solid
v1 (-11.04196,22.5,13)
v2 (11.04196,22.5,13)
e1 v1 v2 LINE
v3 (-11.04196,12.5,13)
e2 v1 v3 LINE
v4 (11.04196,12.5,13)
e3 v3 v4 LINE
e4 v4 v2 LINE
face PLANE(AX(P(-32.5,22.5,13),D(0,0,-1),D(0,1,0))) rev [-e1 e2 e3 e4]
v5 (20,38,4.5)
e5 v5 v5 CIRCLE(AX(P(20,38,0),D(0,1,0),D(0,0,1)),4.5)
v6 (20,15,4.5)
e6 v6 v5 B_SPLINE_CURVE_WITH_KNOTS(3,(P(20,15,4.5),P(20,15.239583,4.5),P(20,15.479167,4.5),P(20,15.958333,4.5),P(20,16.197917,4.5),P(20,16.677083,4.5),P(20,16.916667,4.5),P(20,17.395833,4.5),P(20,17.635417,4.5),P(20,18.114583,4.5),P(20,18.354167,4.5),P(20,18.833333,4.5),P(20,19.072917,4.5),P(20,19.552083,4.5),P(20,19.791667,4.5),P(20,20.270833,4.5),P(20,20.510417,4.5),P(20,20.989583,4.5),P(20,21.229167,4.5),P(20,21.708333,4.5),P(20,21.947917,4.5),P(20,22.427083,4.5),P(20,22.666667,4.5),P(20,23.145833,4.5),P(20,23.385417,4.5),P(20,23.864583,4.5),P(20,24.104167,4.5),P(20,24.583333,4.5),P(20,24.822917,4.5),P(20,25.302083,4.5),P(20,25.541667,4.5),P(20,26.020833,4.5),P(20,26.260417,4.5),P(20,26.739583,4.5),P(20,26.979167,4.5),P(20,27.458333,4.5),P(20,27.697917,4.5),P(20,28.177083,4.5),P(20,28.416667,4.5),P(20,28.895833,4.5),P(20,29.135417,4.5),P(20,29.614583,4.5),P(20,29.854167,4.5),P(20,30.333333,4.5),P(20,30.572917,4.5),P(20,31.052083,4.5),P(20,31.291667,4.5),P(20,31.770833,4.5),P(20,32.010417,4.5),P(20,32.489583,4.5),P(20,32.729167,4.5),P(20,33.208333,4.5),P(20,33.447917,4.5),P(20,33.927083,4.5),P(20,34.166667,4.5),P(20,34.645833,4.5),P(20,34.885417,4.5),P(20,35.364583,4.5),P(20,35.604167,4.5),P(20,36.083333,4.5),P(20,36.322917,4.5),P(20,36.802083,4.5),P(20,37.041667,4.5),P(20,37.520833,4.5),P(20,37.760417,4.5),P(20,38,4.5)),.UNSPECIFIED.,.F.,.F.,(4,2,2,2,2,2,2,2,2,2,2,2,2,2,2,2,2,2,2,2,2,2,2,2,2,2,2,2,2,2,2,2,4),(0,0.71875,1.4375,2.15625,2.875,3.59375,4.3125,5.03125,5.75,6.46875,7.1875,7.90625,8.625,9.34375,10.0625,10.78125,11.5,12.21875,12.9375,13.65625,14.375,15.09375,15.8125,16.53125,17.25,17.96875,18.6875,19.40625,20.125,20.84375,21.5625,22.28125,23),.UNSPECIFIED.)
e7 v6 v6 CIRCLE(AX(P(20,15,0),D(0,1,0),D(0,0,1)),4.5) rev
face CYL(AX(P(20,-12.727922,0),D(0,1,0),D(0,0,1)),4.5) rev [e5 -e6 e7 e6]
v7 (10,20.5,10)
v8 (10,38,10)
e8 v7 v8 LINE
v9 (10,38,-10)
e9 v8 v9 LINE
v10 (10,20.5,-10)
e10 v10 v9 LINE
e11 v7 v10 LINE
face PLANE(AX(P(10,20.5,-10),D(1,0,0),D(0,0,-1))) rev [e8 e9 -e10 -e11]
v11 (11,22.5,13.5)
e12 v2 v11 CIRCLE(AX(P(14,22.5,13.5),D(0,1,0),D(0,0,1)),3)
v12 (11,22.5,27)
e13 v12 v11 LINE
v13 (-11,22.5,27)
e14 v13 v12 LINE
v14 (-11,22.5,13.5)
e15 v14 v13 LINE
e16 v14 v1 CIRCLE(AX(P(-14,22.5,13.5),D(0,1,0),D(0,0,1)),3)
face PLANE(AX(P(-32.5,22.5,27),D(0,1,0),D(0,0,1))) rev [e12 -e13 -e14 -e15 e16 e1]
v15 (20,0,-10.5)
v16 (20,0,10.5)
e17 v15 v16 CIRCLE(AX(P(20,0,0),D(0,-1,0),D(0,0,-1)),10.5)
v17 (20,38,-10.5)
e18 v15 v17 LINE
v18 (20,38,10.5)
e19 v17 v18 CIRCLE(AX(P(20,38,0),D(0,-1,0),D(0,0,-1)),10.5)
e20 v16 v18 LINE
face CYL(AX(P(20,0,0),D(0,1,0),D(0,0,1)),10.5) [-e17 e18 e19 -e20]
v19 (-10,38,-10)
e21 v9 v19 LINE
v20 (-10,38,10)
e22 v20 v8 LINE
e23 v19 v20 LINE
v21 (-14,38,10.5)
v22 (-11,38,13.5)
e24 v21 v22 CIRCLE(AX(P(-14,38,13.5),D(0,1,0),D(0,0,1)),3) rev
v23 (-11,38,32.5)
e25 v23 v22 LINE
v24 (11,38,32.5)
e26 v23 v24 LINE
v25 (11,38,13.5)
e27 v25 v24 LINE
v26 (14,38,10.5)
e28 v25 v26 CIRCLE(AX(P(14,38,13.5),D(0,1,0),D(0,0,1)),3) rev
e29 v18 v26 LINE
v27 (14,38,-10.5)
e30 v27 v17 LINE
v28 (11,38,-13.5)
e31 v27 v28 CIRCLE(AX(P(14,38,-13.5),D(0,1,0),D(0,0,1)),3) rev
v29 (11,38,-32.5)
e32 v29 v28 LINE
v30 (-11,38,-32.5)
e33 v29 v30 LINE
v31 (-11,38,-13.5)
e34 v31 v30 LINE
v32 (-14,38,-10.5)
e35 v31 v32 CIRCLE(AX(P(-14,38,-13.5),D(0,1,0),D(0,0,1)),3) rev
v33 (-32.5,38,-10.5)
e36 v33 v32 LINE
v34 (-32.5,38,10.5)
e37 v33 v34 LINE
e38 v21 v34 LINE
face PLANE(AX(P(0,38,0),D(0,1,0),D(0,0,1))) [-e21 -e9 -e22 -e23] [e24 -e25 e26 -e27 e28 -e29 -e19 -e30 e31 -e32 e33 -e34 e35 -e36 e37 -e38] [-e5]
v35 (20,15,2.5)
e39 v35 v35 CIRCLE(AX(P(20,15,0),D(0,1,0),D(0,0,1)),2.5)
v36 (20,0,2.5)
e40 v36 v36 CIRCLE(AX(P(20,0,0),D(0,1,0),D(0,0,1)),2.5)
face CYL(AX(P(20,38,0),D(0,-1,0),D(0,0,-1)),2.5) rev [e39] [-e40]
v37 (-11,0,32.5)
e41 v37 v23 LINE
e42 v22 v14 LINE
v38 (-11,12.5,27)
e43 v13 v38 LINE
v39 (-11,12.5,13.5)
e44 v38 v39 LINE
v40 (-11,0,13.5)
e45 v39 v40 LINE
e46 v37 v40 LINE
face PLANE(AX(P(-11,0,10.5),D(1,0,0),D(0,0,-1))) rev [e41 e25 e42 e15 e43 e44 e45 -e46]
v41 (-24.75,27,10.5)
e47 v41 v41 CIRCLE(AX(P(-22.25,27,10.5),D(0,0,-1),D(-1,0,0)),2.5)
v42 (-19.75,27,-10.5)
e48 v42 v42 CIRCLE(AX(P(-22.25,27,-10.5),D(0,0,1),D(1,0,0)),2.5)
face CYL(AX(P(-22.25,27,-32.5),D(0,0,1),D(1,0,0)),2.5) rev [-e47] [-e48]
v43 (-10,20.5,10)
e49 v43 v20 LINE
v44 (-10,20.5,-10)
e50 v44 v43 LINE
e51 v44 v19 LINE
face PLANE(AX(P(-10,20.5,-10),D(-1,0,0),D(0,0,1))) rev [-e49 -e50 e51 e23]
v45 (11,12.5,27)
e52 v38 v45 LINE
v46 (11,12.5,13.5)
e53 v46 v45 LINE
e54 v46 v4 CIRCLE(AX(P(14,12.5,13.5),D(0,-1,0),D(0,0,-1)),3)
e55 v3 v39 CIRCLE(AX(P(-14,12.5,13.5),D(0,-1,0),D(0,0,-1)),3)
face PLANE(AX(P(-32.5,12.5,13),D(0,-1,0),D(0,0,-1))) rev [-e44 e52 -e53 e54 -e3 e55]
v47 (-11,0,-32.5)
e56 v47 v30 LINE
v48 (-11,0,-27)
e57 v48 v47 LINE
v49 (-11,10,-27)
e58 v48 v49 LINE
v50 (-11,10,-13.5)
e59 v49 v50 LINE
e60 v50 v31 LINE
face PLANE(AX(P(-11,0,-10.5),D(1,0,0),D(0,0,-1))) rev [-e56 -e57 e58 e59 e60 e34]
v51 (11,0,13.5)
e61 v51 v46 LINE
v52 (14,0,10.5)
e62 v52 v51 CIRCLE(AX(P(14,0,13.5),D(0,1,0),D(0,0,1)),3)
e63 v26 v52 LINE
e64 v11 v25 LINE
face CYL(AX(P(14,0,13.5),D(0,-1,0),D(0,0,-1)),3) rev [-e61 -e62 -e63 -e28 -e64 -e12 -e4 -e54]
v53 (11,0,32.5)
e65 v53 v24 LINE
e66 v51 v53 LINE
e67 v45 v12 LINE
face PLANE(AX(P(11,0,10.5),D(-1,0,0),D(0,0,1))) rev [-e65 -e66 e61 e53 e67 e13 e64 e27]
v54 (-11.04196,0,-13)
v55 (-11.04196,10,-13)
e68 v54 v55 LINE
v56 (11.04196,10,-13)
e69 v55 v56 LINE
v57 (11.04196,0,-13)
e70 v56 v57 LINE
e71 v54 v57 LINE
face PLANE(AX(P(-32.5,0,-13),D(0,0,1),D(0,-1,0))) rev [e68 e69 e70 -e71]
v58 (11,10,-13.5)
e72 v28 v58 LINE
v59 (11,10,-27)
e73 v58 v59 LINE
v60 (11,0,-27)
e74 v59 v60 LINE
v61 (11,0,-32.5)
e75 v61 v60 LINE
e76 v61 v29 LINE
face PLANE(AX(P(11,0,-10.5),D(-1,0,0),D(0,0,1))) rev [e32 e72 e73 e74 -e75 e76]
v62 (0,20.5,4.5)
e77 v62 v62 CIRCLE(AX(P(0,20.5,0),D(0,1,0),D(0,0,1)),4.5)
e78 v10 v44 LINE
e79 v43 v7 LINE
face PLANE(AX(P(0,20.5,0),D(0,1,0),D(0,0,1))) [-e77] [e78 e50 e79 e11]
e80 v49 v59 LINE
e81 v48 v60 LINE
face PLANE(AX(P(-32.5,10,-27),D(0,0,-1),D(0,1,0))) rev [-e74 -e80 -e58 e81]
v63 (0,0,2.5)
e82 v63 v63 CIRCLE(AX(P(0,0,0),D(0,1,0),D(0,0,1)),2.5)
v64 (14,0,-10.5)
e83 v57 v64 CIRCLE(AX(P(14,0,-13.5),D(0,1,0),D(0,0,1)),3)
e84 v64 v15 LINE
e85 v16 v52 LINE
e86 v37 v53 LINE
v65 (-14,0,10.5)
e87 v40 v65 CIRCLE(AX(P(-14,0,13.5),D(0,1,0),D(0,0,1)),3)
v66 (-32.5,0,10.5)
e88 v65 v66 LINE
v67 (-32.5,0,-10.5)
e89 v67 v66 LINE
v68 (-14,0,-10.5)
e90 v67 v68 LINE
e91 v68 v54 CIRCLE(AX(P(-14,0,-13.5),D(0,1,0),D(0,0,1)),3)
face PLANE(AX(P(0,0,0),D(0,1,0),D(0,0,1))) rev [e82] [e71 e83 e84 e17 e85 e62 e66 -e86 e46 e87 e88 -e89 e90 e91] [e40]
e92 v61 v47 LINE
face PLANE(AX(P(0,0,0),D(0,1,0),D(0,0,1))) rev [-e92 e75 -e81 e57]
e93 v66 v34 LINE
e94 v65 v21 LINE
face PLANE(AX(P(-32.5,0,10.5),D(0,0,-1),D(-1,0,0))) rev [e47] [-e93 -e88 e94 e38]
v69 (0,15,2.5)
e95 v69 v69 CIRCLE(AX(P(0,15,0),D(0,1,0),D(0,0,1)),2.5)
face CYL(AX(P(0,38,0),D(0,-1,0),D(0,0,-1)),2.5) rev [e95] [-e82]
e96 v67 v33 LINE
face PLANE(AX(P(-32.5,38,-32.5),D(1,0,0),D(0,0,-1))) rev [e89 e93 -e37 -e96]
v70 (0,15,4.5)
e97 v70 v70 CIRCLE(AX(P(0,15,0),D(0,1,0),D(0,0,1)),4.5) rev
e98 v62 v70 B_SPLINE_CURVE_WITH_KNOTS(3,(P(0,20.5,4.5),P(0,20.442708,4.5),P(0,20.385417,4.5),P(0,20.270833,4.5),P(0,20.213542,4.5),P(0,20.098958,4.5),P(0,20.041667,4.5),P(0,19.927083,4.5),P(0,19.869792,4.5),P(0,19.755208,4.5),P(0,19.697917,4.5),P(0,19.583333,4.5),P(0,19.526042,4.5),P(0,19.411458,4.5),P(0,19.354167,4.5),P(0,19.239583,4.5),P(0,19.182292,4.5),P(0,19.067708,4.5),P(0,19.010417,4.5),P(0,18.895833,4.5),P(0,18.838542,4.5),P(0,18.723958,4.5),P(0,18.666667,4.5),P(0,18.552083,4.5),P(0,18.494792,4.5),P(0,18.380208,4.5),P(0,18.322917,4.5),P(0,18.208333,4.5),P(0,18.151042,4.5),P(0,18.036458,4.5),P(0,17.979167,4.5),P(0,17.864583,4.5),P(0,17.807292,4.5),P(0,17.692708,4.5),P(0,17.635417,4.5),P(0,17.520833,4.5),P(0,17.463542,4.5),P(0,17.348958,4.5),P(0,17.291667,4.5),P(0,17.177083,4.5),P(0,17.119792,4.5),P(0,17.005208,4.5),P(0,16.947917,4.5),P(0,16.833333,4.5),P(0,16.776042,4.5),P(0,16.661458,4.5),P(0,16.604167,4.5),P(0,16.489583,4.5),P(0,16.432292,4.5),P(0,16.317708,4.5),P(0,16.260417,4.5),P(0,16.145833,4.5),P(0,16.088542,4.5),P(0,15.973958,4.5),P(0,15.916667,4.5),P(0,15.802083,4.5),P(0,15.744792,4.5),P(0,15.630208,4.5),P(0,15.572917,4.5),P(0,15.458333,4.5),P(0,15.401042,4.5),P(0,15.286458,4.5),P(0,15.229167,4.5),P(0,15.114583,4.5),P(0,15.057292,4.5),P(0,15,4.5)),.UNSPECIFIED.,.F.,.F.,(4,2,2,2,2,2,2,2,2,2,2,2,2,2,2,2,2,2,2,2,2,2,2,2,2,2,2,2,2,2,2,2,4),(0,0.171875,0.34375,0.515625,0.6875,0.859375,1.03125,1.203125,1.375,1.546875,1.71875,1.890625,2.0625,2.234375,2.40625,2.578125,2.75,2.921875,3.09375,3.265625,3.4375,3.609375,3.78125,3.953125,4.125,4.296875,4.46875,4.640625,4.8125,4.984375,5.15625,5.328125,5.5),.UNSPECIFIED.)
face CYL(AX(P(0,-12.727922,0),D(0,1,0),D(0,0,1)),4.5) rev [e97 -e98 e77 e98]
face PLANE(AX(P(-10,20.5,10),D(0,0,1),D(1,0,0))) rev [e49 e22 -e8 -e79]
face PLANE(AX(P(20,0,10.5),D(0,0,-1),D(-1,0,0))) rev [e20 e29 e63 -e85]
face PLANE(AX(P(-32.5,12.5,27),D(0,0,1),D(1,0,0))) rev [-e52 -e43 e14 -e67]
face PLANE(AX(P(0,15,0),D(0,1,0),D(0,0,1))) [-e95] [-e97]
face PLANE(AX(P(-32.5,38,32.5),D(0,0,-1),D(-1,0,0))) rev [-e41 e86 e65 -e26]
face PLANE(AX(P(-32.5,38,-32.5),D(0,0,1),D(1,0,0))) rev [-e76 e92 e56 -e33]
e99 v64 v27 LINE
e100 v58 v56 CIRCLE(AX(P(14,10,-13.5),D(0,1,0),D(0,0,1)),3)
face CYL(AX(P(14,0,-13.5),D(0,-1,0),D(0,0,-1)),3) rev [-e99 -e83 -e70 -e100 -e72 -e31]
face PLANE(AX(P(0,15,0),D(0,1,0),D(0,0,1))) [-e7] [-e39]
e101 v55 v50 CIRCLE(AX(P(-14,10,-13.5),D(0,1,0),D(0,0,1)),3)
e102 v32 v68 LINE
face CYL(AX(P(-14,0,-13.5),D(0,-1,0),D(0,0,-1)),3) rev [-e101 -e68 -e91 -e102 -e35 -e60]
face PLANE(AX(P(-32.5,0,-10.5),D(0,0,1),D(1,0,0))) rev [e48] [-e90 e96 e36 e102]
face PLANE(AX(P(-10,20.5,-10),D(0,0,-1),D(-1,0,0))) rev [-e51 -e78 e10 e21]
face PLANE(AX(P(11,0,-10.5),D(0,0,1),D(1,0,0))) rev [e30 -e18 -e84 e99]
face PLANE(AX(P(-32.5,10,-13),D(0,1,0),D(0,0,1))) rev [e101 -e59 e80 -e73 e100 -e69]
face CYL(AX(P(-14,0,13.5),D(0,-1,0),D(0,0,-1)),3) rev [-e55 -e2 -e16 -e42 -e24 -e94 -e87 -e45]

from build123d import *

# Parameters (mm, degrees)
SKETCH1_W               = 65
SKETCH1_H               = 65
SKETCH1_R               = 2.5
BOSS_EXTRUDE1_DEPTH     = 38
SKETCH3_W               = 21.5
SKETCH3_H               = 22
CUT_EXTRUDE2_DEPTH      = 60.636398282
CUT_EXTRUDE3_DEPTH      = 60.636398282
CUT_EXTRUDE3_DEPTH_BACK = 60.636398282
SKETCH4_R               = 2.5
CUT_EXTRUDE4_DEPTH      = 60.636398282
CUT_EXTRUDE4_DEPTH_BACK = 60.636398282
SKETCH6_W               = 14
SKETCH6_H               = 10
SKETCH7_W               = 20
SKETCH7_H               = 20
CUT_EXTRUDE5_DEPTH      = 17.5
FILLET1_R               = 3
SKETCH8_R               = 4.5
CUT_EXTRUDE6_DEPTH      = 23


with BuildPart() as part:
    # Sketch1 → Boss-Extrude1 (new body)
    with BuildSketch(Plane(origin=(0, 0, 0), x_dir=(1, 0, 0), z_dir=(0, 1, 0))):
        Rectangle(SKETCH1_W, SKETCH1_H)
        with Locations(Location((0, 0, 0), (0, 0, 270))):
            Circle(SKETCH1_R, mode=Mode.SUBTRACT)
        with Locations(Location((20, 0, 0), (0, 0, 270))):
            Circle(SKETCH1_R, mode=Mode.SUBTRACT)
    extrude(amount=BOSS_EXTRUDE1_DEPTH)

    # Sketch3 → Cut-Extrude2 (cut, through all)
    with BuildSketch(Plane(origin=(0, 38, 0), x_dir=(1, 0, 0), z_dir=(0, 1, 0))):
        with Locations((-21.75, 21.5)):
            Rectangle(SKETCH3_W, SKETCH3_H)
        with BuildLine():
            Line((11, 32.5), (32.5, 32.5))
            Line((32.5, 32.5), (32.5, -32.5))
            Line((32.5, -32.5), (11, -32.5))
            Line((11, -32.5), (11, -10.5))
            Line((11, -10.5), (20, -10.5))
            ThreePointArc((20, -10.5), (30.5, 0), (20, 10.5))
            Line((20, 10.5), (11, 10.5))
            Line((11, 10.5), (11, 32.5))
        make_face()
        with Locations((-21.75, -21.5)):
            Rectangle(SKETCH3_W, SKETCH3_H)
    extrude(amount=-CUT_EXTRUDE2_DEPTH, mode=Mode.SUBTRACT)

    # Sketch4 → Cut-Extrude3 (cut, two sides: drawn at the far end of the back side and taken through both)
    with BuildSketch(Plane.XY.offset(-CUT_EXTRUDE3_DEPTH_BACK)):
        with Locations((-22.25, 27)):
            Circle(SKETCH4_R)
    extrude(amount=CUT_EXTRUDE3_DEPTH + CUT_EXTRUDE3_DEPTH_BACK, mode=Mode.SUBTRACT)

    # Sketch6 → Cut-Extrude4 (cut, two sides: drawn at the far end of the back side and taken through both)
    with BuildSketch(Plane(origin=(0, 0, 0), x_dir=(0, 0, -1), z_dir=(1, 0, 0)).offset(-CUT_EXTRUDE4_DEPTH_BACK)):
        with Locations((-20, 17.5)):
            Rectangle(SKETCH6_W, SKETCH6_H)
        with Locations((20, 5)):
            Rectangle(SKETCH6_W, SKETCH6_H)
    extrude(amount=CUT_EXTRUDE4_DEPTH + CUT_EXTRUDE4_DEPTH_BACK, mode=Mode.SUBTRACT)

    # Sketch7 → Cut-Extrude5 (cut)
    with BuildSketch(Plane(origin=(0, 38, 0), x_dir=(1, 0, 0), z_dir=(0, 1, 0))):
        Rectangle(SKETCH7_W, SKETCH7_H)
    extrude(amount=-CUT_EXTRUDE5_DEPTH, mode=Mode.SUBTRACT)

    # Fillet1
    # the kernel refuses this fillet: 3 mm, written as the material it adds along each edge
    with BuildSketch(Plane(origin=(11, 38, -10.5), x_dir=(0, 0, -1), z_dir=(0, -1, 0))) as fillet1_piece_1_section:
        with BuildLine():
            CenterArc((FILLET1_R, FILLET1_R), FILLET1_R, 180, 90)
            Line((0, FILLET1_R), (0, 0))
            Line((0, 0), (FILLET1_R, 0))
        make_face()
    fillet1_piece_1 = extrude(amount=38, mode=Mode.PRIVATE)
    fillet1_piece_1 = split(fillet1_piece_1, bisect_by=Plane(origin=(10.978029732, 10, -13.226390424), z_dir=(0, 1, 0)), keep=Keep.TOP, mode=Mode.PRIVATE)
    fillet1_piece_1 = split(fillet1_piece_1, bisect_by=Plane(origin=(10.978029732, 24, -13), z_dir=(0, 0, -1)), keep=Keep.TOP, mode=Mode.PRIVATE)
    add(fillet1_piece_1)
    with BuildSketch(Plane(origin=(11, 38, -10.5), x_dir=(0, 0, -1), z_dir=(0, -1, 0))) as fillet1_piece_2_section:
        with BuildLine():
            CenterArc((FILLET1_R, FILLET1_R), FILLET1_R, 180, 90)
            Line((0, FILLET1_R), (0, 0))
            Line((0, 0), (FILLET1_R, 0))
        make_face()
    fillet1_piece_2 = extrude(amount=38, mode=Mode.PRIVATE)
    fillet1_piece_2 = split(fillet1_piece_2, bisect_by=Plane(origin=(11.690666213, 10, -11.145663974), z_dir=(0, 1, 0)), keep=Keep.TOP, mode=Mode.PRIVATE)
    fillet1_piece_2 = split(fillet1_piece_2, bisect_by=Plane(origin=(11.690666213, 24, -13), z_dir=(0, 0, 1)), keep=Keep.TOP, mode=Mode.PRIVATE)
    add(fillet1_piece_2)
    with BuildSketch(Plane(origin=(11, 38, -10.5), x_dir=(0, 0, -1), z_dir=(0, -1, 0))) as fillet1_piece_3_section:
        with BuildLine():
            CenterArc((FILLET1_R, FILLET1_R), FILLET1_R, 180, 90)
            Line((0, FILLET1_R), (0, 0))
            Line((0, 0), (FILLET1_R, 0))
        make_face()
    fillet1_piece_3 = extrude(amount=38, mode=Mode.PRIVATE)
    fillet1_piece_3 = split(fillet1_piece_3, bisect_by=Plane(origin=(11.690666213, 10, -11.145663974), z_dir=(0, -1, 0)), keep=Keep.TOP, mode=Mode.PRIVATE)
    fillet1_piece_3 = split(fillet1_piece_3, bisect_by=Plane(origin=(11.690666213, 5, -13), z_dir=(0, 0, 1)), keep=Keep.TOP, mode=Mode.PRIVATE)
    add(fillet1_piece_3)
    with BuildSketch(Plane(origin=(11, 38, 10.5), x_dir=(1, 0, 0), z_dir=(0, -1, 0))) as fillet1_piece_4_section:
        with BuildLine():
            CenterArc((FILLET1_R, FILLET1_R), FILLET1_R, 180, 90)
            Line((0, FILLET1_R), (0, 0))
            Line((0, 0), (FILLET1_R, 0))
        make_face()
    fillet1_piece_4 = extrude(amount=38, mode=Mode.PRIVATE)
    fillet1_piece_4 = split(fillet1_piece_4, bisect_by=Plane(origin=(11.690666213, 22.5, 11.145663974), z_dir=(0, 1, 0)), keep=Keep.TOP, mode=Mode.PRIVATE)
    fillet1_piece_4 = split(fillet1_piece_4, bisect_by=Plane(origin=(11.690666213, 30.25, 13), z_dir=(0, 0, -1)), keep=Keep.TOP, mode=Mode.PRIVATE)
    add(fillet1_piece_4)
    with BuildSketch(Plane(origin=(11, 38, 10.5), x_dir=(1, 0, 0), z_dir=(0, -1, 0))) as fillet1_piece_5_section:
        with BuildLine():
            CenterArc((FILLET1_R, FILLET1_R), FILLET1_R, 180, 90)
            Line((0, FILLET1_R), (0, 0))
            Line((0, 0), (FILLET1_R, 0))
        make_face()
    fillet1_piece_5 = extrude(amount=38, mode=Mode.PRIVATE)
    fillet1_piece_5 = split(fillet1_piece_5, bisect_by=Plane(origin=(10.978029732, 22.5, 13.226390424), z_dir=(0, 1, 0)), keep=Keep.TOP, mode=Mode.PRIVATE)
    fillet1_piece_5 = split(fillet1_piece_5, bisect_by=Plane(origin=(10.978029732, 30.25, 13), z_dir=(0, 0, 1)), keep=Keep.TOP, mode=Mode.PRIVATE)
    add(fillet1_piece_5)
    with BuildSketch(Plane(origin=(11, 38, 10.5), x_dir=(1, 0, 0), z_dir=(0, -1, 0))) as fillet1_piece_6_section:
        with BuildLine():
            CenterArc((FILLET1_R, FILLET1_R), FILLET1_R, 180, 90)
            Line((0, FILLET1_R), (0, 0))
            Line((0, 0), (FILLET1_R, 0))
        make_face()
    fillet1_piece_6 = extrude(amount=38, mode=Mode.PRIVATE)
    fillet1_piece_6 = split(fillet1_piece_6, bisect_by=Plane(origin=(11.690666213, 22.5, 11.145663974), z_dir=(0, -1, 0)), keep=Keep.TOP, mode=Mode.PRIVATE)
    fillet1_piece_6 = split(fillet1_piece_6, bisect_by=Plane(origin=(11.690666213, 12.5, 11.145663974), z_dir=(0, 1, 0)), keep=Keep.TOP, mode=Mode.PRIVATE)
    fillet1_piece_6 = split(fillet1_piece_6, bisect_by=Plane(origin=(11.690666213, 17.5, 13), z_dir=(0, 0, -1)), keep=Keep.TOP, mode=Mode.PRIVATE)
    add(fillet1_piece_6)
    with BuildSketch(Plane(origin=(11, 38, 10.5), x_dir=(1, 0, 0), z_dir=(0, -1, 0))) as fillet1_piece_7_section:
        with BuildLine():
            CenterArc((FILLET1_R, FILLET1_R), FILLET1_R, 180, 90)
            Line((0, FILLET1_R), (0, 0))
            Line((0, 0), (FILLET1_R, 0))
        make_face()
    fillet1_piece_7 = extrude(amount=38, mode=Mode.PRIVATE)
    fillet1_piece_7 = split(fillet1_piece_7, bisect_by=Plane(origin=(11.690666213, 12.5, 11.145663974), z_dir=(0, -1, 0)), keep=Keep.TOP, mode=Mode.PRIVATE)
    fillet1_piece_7 = split(fillet1_piece_7, bisect_by=Plane(origin=(11.690666213, 6.25, 13), z_dir=(0, 0, -1)), keep=Keep.TOP, mode=Mode.PRIVATE)
    add(fillet1_piece_7)
    with BuildSketch(Plane(origin=(11, 38, 10.5), x_dir=(1, 0, 0), z_dir=(0, -1, 0))) as fillet1_piece_8_section:
        with BuildLine():
            CenterArc((FILLET1_R, FILLET1_R), FILLET1_R, 180, 90)
            Line((0, FILLET1_R), (0, 0))
            Line((0, 0), (FILLET1_R, 0))
        make_face()
    fillet1_piece_8 = extrude(amount=38, mode=Mode.PRIVATE)
    fillet1_piece_8 = split(fillet1_piece_8, bisect_by=Plane(origin=(10.978029732, 12.5, 13.226390424), z_dir=(0, -1, 0)), keep=Keep.TOP, mode=Mode.PRIVATE)
    fillet1_piece_8 = split(fillet1_piece_8, bisect_by=Plane(origin=(10.978029732, 6.25, 13), z_dir=(0, 0, 1)), keep=Keep.TOP, mode=Mode.PRIVATE)
    add(fillet1_piece_8)
    with BuildSketch(Plane(origin=(-11, 38, 10.5), x_dir=(-1, 0, 0), z_dir=(0, -1, 0))) as fillet1_piece_9_section:
        with BuildLine():
            CenterArc((FILLET1_R, -FILLET1_R), FILLET1_R, 90, 90)
            Line((0, -FILLET1_R), (0, 0))
            Line((0, 0), (FILLET1_R, 0))
        make_face()
    fillet1_piece_9 = extrude(amount=38, mode=Mode.PRIVATE)
    fillet1_piece_9 = split(fillet1_piece_9, bisect_by=Plane(origin=(-11.690666213, 22.5, 11.145663974), z_dir=(0, 1, 0)), keep=Keep.TOP, mode=Mode.PRIVATE)
    fillet1_piece_9 = split(fillet1_piece_9, bisect_by=Plane(origin=(-11.690666213, 30.25, 13), z_dir=(0, 0, -1)), keep=Keep.TOP, mode=Mode.PRIVATE)
    add(fillet1_piece_9)
    with BuildSketch(Plane(origin=(-11, 38, 10.5), x_dir=(-1, 0, 0), z_dir=(0, -1, 0))) as fillet1_piece_10_section:
        with BuildLine():
            CenterArc((FILLET1_R, -FILLET1_R), FILLET1_R, 90, 90)
            Line((0, -FILLET1_R), (0, 0))
            Line((0, 0), (FILLET1_R, 0))
        make_face()
    fillet1_piece_10 = extrude(amount=38, mode=Mode.PRIVATE)
    fillet1_piece_10 = split(fillet1_piece_10, bisect_by=Plane(origin=(-10.978029732, 22.5, 13.226390424), z_dir=(0, 1, 0)), keep=Keep.TOP, mode=Mode.PRIVATE)
    fillet1_piece_10 = split(fillet1_piece_10, bisect_by=Plane(origin=(-10.978029732, 30.25, 13), z_dir=(0, 0, 1)), keep=Keep.TOP, mode=Mode.PRIVATE)
    add(fillet1_piece_10)
    with BuildSketch(Plane(origin=(-11, 38, 10.5), x_dir=(-1, 0, 0), z_dir=(0, -1, 0))) as fillet1_piece_11_section:
        with BuildLine():
            CenterArc((FILLET1_R, -FILLET1_R), FILLET1_R, 90, 90)
            Line((0, -FILLET1_R), (0, 0))
            Line((0, 0), (FILLET1_R, 0))
        make_face()
    fillet1_piece_11 = extrude(amount=38, mode=Mode.PRIVATE)
    fillet1_piece_11 = split(fillet1_piece_11, bisect_by=Plane(origin=(-11.690666213, 22.5, 11.145663974), z_dir=(0, -1, 0)), keep=Keep.TOP, mode=Mode.PRIVATE)
    fillet1_piece_11 = split(fillet1_piece_11, bisect_by=Plane(origin=(-11.690666213, 17.5, 13), z_dir=(0, 0, -1)), keep=Keep.TOP, mode=Mode.PRIVATE)
    fillet1_piece_11 = split(fillet1_piece_11, bisect_by=Plane(origin=(-11.690666213, 12.5, 11.145663974), z_dir=(0, 1, 0)), keep=Keep.TOP, mode=Mode.PRIVATE)
    add(fillet1_piece_11)
    with BuildSketch(Plane(origin=(-11, 38, 10.5), x_dir=(-1, 0, 0), z_dir=(0, -1, 0))) as fillet1_piece_12_section:
        with BuildLine():
            CenterArc((FILLET1_R, -FILLET1_R), FILLET1_R, 90, 90)
            Line((0, -FILLET1_R), (0, 0))
            Line((0, 0), (FILLET1_R, 0))
        make_face()
    fillet1_piece_12 = extrude(amount=38, mode=Mode.PRIVATE)
    fillet1_piece_12 = split(fillet1_piece_12, bisect_by=Plane(origin=(-11.690666213, 6.25, 13), z_dir=(0, 0, -1)), keep=Keep.TOP, mode=Mode.PRIVATE)
    fillet1_piece_12 = split(fillet1_piece_12, bisect_by=Plane(origin=(-11.690666213, 12.5, 11.145663974), z_dir=(0, -1, 0)), keep=Keep.TOP, mode=Mode.PRIVATE)
    add(fillet1_piece_12)
    with BuildSketch(Plane(origin=(-11, 38, 10.5), x_dir=(-1, 0, 0), z_dir=(0, -1, 0))) as fillet1_piece_13_section:
        with BuildLine():
            CenterArc((FILLET1_R, -FILLET1_R), FILLET1_R, 90, 90)
            Line((0, -FILLET1_R), (0, 0))
            Line((0, 0), (FILLET1_R, 0))
        make_face()
    fillet1_piece_13 = extrude(amount=38, mode=Mode.PRIVATE)
    fillet1_piece_13 = split(fillet1_piece_13, bisect_by=Plane(origin=(-10.978029732, 6.25, 13), z_dir=(0, 0, 1)), keep=Keep.TOP, mode=Mode.PRIVATE)
    fillet1_piece_13 = split(fillet1_piece_13, bisect_by=Plane(origin=(-10.978029732, 12.5, 13.226390424), z_dir=(0, -1, 0)), keep=Keep.TOP, mode=Mode.PRIVATE)
    add(fillet1_piece_13)
    with BuildSketch(Plane(origin=(-11, 38, -10.5), x_dir=(0, 0, -1), z_dir=(0, -1, 0))) as fillet1_piece_14_section:
        with BuildLine():
            CenterArc((FILLET1_R, -FILLET1_R), FILLET1_R, 90, 90)
            Line((0, -FILLET1_R), (0, 0))
            Line((0, 0), (FILLET1_R, 0))
        make_face()
    fillet1_piece_14 = extrude(amount=38, mode=Mode.PRIVATE)
    fillet1_piece_14 = split(fillet1_piece_14, bisect_by=Plane(origin=(-10.978029732, 10, -13.226390424), z_dir=(0, 1, 0)), keep=Keep.TOP, mode=Mode.PRIVATE)
    fillet1_piece_14 = split(fillet1_piece_14, bisect_by=Plane(origin=(-10.978029732, 24, -13), z_dir=(0, 0, -1)), keep=Keep.TOP, mode=Mode.PRIVATE)
    add(fillet1_piece_14)
    with BuildSketch(Plane(origin=(-11, 38, -10.5), x_dir=(0, 0, -1), z_dir=(0, -1, 0))) as fillet1_piece_15_section:
        with BuildLine():
            CenterArc((FILLET1_R, -FILLET1_R), FILLET1_R, 90, 90)
            Line((0, -FILLET1_R), (0, 0))
            Line((0, 0), (FILLET1_R, 0))
        make_face()
    fillet1_piece_15 = extrude(amount=38, mode=Mode.PRIVATE)
    fillet1_piece_15 = split(fillet1_piece_15, bisect_by=Plane(origin=(-11.690666213, 10, -11.145663974), z_dir=(0, 1, 0)), keep=Keep.TOP, mode=Mode.PRIVATE)
    fillet1_piece_15 = split(fillet1_piece_15, bisect_by=Plane(origin=(-11.690666213, 24, -13), z_dir=(0, 0, 1)), keep=Keep.TOP, mode=Mode.PRIVATE)
    add(fillet1_piece_15)
    with BuildSketch(Plane(origin=(-11, 38, -10.5), x_dir=(0, 0, -1), z_dir=(0, -1, 0))) as fillet1_piece_16_section:
        with BuildLine():
            CenterArc((FILLET1_R, -FILLET1_R), FILLET1_R, 90, 90)
            Line((0, -FILLET1_R), (0, 0))
            Line((0, 0), (FILLET1_R, 0))
        make_face()
    fillet1_piece_16 = extrude(amount=38, mode=Mode.PRIVATE)
    fillet1_piece_16 = split(fillet1_piece_16, bisect_by=Plane(origin=(-11.690666213, 10, -11.145663974), z_dir=(0, -1, 0)), keep=Keep.TOP, mode=Mode.PRIVATE)
    fillet1_piece_16 = split(fillet1_piece_16, bisect_by=Plane(origin=(-11.690666213, 5, -13), z_dir=(0, 0, 1)), keep=Keep.TOP, mode=Mode.PRIVATE)
    add(fillet1_piece_16)

    # Sketch8 → Cut-Extrude6 (cut)
    with BuildSketch(Plane(origin=(0, 38, 0), x_dir=(1, 0, 0), z_dir=(0, 1, 0))):
        with Locations(Location((20, 0, 0), (0, 0, 270))):
            Circle(SKETCH8_R)
        with Locations(Location((0, 0, 0), (0, 0, 270))):
            Circle(SKETCH8_R)
    extrude(amount=-CUT_EXTRUDE6_DEPTH, mode=Mode.SUBTRACT)


solid = part.part
